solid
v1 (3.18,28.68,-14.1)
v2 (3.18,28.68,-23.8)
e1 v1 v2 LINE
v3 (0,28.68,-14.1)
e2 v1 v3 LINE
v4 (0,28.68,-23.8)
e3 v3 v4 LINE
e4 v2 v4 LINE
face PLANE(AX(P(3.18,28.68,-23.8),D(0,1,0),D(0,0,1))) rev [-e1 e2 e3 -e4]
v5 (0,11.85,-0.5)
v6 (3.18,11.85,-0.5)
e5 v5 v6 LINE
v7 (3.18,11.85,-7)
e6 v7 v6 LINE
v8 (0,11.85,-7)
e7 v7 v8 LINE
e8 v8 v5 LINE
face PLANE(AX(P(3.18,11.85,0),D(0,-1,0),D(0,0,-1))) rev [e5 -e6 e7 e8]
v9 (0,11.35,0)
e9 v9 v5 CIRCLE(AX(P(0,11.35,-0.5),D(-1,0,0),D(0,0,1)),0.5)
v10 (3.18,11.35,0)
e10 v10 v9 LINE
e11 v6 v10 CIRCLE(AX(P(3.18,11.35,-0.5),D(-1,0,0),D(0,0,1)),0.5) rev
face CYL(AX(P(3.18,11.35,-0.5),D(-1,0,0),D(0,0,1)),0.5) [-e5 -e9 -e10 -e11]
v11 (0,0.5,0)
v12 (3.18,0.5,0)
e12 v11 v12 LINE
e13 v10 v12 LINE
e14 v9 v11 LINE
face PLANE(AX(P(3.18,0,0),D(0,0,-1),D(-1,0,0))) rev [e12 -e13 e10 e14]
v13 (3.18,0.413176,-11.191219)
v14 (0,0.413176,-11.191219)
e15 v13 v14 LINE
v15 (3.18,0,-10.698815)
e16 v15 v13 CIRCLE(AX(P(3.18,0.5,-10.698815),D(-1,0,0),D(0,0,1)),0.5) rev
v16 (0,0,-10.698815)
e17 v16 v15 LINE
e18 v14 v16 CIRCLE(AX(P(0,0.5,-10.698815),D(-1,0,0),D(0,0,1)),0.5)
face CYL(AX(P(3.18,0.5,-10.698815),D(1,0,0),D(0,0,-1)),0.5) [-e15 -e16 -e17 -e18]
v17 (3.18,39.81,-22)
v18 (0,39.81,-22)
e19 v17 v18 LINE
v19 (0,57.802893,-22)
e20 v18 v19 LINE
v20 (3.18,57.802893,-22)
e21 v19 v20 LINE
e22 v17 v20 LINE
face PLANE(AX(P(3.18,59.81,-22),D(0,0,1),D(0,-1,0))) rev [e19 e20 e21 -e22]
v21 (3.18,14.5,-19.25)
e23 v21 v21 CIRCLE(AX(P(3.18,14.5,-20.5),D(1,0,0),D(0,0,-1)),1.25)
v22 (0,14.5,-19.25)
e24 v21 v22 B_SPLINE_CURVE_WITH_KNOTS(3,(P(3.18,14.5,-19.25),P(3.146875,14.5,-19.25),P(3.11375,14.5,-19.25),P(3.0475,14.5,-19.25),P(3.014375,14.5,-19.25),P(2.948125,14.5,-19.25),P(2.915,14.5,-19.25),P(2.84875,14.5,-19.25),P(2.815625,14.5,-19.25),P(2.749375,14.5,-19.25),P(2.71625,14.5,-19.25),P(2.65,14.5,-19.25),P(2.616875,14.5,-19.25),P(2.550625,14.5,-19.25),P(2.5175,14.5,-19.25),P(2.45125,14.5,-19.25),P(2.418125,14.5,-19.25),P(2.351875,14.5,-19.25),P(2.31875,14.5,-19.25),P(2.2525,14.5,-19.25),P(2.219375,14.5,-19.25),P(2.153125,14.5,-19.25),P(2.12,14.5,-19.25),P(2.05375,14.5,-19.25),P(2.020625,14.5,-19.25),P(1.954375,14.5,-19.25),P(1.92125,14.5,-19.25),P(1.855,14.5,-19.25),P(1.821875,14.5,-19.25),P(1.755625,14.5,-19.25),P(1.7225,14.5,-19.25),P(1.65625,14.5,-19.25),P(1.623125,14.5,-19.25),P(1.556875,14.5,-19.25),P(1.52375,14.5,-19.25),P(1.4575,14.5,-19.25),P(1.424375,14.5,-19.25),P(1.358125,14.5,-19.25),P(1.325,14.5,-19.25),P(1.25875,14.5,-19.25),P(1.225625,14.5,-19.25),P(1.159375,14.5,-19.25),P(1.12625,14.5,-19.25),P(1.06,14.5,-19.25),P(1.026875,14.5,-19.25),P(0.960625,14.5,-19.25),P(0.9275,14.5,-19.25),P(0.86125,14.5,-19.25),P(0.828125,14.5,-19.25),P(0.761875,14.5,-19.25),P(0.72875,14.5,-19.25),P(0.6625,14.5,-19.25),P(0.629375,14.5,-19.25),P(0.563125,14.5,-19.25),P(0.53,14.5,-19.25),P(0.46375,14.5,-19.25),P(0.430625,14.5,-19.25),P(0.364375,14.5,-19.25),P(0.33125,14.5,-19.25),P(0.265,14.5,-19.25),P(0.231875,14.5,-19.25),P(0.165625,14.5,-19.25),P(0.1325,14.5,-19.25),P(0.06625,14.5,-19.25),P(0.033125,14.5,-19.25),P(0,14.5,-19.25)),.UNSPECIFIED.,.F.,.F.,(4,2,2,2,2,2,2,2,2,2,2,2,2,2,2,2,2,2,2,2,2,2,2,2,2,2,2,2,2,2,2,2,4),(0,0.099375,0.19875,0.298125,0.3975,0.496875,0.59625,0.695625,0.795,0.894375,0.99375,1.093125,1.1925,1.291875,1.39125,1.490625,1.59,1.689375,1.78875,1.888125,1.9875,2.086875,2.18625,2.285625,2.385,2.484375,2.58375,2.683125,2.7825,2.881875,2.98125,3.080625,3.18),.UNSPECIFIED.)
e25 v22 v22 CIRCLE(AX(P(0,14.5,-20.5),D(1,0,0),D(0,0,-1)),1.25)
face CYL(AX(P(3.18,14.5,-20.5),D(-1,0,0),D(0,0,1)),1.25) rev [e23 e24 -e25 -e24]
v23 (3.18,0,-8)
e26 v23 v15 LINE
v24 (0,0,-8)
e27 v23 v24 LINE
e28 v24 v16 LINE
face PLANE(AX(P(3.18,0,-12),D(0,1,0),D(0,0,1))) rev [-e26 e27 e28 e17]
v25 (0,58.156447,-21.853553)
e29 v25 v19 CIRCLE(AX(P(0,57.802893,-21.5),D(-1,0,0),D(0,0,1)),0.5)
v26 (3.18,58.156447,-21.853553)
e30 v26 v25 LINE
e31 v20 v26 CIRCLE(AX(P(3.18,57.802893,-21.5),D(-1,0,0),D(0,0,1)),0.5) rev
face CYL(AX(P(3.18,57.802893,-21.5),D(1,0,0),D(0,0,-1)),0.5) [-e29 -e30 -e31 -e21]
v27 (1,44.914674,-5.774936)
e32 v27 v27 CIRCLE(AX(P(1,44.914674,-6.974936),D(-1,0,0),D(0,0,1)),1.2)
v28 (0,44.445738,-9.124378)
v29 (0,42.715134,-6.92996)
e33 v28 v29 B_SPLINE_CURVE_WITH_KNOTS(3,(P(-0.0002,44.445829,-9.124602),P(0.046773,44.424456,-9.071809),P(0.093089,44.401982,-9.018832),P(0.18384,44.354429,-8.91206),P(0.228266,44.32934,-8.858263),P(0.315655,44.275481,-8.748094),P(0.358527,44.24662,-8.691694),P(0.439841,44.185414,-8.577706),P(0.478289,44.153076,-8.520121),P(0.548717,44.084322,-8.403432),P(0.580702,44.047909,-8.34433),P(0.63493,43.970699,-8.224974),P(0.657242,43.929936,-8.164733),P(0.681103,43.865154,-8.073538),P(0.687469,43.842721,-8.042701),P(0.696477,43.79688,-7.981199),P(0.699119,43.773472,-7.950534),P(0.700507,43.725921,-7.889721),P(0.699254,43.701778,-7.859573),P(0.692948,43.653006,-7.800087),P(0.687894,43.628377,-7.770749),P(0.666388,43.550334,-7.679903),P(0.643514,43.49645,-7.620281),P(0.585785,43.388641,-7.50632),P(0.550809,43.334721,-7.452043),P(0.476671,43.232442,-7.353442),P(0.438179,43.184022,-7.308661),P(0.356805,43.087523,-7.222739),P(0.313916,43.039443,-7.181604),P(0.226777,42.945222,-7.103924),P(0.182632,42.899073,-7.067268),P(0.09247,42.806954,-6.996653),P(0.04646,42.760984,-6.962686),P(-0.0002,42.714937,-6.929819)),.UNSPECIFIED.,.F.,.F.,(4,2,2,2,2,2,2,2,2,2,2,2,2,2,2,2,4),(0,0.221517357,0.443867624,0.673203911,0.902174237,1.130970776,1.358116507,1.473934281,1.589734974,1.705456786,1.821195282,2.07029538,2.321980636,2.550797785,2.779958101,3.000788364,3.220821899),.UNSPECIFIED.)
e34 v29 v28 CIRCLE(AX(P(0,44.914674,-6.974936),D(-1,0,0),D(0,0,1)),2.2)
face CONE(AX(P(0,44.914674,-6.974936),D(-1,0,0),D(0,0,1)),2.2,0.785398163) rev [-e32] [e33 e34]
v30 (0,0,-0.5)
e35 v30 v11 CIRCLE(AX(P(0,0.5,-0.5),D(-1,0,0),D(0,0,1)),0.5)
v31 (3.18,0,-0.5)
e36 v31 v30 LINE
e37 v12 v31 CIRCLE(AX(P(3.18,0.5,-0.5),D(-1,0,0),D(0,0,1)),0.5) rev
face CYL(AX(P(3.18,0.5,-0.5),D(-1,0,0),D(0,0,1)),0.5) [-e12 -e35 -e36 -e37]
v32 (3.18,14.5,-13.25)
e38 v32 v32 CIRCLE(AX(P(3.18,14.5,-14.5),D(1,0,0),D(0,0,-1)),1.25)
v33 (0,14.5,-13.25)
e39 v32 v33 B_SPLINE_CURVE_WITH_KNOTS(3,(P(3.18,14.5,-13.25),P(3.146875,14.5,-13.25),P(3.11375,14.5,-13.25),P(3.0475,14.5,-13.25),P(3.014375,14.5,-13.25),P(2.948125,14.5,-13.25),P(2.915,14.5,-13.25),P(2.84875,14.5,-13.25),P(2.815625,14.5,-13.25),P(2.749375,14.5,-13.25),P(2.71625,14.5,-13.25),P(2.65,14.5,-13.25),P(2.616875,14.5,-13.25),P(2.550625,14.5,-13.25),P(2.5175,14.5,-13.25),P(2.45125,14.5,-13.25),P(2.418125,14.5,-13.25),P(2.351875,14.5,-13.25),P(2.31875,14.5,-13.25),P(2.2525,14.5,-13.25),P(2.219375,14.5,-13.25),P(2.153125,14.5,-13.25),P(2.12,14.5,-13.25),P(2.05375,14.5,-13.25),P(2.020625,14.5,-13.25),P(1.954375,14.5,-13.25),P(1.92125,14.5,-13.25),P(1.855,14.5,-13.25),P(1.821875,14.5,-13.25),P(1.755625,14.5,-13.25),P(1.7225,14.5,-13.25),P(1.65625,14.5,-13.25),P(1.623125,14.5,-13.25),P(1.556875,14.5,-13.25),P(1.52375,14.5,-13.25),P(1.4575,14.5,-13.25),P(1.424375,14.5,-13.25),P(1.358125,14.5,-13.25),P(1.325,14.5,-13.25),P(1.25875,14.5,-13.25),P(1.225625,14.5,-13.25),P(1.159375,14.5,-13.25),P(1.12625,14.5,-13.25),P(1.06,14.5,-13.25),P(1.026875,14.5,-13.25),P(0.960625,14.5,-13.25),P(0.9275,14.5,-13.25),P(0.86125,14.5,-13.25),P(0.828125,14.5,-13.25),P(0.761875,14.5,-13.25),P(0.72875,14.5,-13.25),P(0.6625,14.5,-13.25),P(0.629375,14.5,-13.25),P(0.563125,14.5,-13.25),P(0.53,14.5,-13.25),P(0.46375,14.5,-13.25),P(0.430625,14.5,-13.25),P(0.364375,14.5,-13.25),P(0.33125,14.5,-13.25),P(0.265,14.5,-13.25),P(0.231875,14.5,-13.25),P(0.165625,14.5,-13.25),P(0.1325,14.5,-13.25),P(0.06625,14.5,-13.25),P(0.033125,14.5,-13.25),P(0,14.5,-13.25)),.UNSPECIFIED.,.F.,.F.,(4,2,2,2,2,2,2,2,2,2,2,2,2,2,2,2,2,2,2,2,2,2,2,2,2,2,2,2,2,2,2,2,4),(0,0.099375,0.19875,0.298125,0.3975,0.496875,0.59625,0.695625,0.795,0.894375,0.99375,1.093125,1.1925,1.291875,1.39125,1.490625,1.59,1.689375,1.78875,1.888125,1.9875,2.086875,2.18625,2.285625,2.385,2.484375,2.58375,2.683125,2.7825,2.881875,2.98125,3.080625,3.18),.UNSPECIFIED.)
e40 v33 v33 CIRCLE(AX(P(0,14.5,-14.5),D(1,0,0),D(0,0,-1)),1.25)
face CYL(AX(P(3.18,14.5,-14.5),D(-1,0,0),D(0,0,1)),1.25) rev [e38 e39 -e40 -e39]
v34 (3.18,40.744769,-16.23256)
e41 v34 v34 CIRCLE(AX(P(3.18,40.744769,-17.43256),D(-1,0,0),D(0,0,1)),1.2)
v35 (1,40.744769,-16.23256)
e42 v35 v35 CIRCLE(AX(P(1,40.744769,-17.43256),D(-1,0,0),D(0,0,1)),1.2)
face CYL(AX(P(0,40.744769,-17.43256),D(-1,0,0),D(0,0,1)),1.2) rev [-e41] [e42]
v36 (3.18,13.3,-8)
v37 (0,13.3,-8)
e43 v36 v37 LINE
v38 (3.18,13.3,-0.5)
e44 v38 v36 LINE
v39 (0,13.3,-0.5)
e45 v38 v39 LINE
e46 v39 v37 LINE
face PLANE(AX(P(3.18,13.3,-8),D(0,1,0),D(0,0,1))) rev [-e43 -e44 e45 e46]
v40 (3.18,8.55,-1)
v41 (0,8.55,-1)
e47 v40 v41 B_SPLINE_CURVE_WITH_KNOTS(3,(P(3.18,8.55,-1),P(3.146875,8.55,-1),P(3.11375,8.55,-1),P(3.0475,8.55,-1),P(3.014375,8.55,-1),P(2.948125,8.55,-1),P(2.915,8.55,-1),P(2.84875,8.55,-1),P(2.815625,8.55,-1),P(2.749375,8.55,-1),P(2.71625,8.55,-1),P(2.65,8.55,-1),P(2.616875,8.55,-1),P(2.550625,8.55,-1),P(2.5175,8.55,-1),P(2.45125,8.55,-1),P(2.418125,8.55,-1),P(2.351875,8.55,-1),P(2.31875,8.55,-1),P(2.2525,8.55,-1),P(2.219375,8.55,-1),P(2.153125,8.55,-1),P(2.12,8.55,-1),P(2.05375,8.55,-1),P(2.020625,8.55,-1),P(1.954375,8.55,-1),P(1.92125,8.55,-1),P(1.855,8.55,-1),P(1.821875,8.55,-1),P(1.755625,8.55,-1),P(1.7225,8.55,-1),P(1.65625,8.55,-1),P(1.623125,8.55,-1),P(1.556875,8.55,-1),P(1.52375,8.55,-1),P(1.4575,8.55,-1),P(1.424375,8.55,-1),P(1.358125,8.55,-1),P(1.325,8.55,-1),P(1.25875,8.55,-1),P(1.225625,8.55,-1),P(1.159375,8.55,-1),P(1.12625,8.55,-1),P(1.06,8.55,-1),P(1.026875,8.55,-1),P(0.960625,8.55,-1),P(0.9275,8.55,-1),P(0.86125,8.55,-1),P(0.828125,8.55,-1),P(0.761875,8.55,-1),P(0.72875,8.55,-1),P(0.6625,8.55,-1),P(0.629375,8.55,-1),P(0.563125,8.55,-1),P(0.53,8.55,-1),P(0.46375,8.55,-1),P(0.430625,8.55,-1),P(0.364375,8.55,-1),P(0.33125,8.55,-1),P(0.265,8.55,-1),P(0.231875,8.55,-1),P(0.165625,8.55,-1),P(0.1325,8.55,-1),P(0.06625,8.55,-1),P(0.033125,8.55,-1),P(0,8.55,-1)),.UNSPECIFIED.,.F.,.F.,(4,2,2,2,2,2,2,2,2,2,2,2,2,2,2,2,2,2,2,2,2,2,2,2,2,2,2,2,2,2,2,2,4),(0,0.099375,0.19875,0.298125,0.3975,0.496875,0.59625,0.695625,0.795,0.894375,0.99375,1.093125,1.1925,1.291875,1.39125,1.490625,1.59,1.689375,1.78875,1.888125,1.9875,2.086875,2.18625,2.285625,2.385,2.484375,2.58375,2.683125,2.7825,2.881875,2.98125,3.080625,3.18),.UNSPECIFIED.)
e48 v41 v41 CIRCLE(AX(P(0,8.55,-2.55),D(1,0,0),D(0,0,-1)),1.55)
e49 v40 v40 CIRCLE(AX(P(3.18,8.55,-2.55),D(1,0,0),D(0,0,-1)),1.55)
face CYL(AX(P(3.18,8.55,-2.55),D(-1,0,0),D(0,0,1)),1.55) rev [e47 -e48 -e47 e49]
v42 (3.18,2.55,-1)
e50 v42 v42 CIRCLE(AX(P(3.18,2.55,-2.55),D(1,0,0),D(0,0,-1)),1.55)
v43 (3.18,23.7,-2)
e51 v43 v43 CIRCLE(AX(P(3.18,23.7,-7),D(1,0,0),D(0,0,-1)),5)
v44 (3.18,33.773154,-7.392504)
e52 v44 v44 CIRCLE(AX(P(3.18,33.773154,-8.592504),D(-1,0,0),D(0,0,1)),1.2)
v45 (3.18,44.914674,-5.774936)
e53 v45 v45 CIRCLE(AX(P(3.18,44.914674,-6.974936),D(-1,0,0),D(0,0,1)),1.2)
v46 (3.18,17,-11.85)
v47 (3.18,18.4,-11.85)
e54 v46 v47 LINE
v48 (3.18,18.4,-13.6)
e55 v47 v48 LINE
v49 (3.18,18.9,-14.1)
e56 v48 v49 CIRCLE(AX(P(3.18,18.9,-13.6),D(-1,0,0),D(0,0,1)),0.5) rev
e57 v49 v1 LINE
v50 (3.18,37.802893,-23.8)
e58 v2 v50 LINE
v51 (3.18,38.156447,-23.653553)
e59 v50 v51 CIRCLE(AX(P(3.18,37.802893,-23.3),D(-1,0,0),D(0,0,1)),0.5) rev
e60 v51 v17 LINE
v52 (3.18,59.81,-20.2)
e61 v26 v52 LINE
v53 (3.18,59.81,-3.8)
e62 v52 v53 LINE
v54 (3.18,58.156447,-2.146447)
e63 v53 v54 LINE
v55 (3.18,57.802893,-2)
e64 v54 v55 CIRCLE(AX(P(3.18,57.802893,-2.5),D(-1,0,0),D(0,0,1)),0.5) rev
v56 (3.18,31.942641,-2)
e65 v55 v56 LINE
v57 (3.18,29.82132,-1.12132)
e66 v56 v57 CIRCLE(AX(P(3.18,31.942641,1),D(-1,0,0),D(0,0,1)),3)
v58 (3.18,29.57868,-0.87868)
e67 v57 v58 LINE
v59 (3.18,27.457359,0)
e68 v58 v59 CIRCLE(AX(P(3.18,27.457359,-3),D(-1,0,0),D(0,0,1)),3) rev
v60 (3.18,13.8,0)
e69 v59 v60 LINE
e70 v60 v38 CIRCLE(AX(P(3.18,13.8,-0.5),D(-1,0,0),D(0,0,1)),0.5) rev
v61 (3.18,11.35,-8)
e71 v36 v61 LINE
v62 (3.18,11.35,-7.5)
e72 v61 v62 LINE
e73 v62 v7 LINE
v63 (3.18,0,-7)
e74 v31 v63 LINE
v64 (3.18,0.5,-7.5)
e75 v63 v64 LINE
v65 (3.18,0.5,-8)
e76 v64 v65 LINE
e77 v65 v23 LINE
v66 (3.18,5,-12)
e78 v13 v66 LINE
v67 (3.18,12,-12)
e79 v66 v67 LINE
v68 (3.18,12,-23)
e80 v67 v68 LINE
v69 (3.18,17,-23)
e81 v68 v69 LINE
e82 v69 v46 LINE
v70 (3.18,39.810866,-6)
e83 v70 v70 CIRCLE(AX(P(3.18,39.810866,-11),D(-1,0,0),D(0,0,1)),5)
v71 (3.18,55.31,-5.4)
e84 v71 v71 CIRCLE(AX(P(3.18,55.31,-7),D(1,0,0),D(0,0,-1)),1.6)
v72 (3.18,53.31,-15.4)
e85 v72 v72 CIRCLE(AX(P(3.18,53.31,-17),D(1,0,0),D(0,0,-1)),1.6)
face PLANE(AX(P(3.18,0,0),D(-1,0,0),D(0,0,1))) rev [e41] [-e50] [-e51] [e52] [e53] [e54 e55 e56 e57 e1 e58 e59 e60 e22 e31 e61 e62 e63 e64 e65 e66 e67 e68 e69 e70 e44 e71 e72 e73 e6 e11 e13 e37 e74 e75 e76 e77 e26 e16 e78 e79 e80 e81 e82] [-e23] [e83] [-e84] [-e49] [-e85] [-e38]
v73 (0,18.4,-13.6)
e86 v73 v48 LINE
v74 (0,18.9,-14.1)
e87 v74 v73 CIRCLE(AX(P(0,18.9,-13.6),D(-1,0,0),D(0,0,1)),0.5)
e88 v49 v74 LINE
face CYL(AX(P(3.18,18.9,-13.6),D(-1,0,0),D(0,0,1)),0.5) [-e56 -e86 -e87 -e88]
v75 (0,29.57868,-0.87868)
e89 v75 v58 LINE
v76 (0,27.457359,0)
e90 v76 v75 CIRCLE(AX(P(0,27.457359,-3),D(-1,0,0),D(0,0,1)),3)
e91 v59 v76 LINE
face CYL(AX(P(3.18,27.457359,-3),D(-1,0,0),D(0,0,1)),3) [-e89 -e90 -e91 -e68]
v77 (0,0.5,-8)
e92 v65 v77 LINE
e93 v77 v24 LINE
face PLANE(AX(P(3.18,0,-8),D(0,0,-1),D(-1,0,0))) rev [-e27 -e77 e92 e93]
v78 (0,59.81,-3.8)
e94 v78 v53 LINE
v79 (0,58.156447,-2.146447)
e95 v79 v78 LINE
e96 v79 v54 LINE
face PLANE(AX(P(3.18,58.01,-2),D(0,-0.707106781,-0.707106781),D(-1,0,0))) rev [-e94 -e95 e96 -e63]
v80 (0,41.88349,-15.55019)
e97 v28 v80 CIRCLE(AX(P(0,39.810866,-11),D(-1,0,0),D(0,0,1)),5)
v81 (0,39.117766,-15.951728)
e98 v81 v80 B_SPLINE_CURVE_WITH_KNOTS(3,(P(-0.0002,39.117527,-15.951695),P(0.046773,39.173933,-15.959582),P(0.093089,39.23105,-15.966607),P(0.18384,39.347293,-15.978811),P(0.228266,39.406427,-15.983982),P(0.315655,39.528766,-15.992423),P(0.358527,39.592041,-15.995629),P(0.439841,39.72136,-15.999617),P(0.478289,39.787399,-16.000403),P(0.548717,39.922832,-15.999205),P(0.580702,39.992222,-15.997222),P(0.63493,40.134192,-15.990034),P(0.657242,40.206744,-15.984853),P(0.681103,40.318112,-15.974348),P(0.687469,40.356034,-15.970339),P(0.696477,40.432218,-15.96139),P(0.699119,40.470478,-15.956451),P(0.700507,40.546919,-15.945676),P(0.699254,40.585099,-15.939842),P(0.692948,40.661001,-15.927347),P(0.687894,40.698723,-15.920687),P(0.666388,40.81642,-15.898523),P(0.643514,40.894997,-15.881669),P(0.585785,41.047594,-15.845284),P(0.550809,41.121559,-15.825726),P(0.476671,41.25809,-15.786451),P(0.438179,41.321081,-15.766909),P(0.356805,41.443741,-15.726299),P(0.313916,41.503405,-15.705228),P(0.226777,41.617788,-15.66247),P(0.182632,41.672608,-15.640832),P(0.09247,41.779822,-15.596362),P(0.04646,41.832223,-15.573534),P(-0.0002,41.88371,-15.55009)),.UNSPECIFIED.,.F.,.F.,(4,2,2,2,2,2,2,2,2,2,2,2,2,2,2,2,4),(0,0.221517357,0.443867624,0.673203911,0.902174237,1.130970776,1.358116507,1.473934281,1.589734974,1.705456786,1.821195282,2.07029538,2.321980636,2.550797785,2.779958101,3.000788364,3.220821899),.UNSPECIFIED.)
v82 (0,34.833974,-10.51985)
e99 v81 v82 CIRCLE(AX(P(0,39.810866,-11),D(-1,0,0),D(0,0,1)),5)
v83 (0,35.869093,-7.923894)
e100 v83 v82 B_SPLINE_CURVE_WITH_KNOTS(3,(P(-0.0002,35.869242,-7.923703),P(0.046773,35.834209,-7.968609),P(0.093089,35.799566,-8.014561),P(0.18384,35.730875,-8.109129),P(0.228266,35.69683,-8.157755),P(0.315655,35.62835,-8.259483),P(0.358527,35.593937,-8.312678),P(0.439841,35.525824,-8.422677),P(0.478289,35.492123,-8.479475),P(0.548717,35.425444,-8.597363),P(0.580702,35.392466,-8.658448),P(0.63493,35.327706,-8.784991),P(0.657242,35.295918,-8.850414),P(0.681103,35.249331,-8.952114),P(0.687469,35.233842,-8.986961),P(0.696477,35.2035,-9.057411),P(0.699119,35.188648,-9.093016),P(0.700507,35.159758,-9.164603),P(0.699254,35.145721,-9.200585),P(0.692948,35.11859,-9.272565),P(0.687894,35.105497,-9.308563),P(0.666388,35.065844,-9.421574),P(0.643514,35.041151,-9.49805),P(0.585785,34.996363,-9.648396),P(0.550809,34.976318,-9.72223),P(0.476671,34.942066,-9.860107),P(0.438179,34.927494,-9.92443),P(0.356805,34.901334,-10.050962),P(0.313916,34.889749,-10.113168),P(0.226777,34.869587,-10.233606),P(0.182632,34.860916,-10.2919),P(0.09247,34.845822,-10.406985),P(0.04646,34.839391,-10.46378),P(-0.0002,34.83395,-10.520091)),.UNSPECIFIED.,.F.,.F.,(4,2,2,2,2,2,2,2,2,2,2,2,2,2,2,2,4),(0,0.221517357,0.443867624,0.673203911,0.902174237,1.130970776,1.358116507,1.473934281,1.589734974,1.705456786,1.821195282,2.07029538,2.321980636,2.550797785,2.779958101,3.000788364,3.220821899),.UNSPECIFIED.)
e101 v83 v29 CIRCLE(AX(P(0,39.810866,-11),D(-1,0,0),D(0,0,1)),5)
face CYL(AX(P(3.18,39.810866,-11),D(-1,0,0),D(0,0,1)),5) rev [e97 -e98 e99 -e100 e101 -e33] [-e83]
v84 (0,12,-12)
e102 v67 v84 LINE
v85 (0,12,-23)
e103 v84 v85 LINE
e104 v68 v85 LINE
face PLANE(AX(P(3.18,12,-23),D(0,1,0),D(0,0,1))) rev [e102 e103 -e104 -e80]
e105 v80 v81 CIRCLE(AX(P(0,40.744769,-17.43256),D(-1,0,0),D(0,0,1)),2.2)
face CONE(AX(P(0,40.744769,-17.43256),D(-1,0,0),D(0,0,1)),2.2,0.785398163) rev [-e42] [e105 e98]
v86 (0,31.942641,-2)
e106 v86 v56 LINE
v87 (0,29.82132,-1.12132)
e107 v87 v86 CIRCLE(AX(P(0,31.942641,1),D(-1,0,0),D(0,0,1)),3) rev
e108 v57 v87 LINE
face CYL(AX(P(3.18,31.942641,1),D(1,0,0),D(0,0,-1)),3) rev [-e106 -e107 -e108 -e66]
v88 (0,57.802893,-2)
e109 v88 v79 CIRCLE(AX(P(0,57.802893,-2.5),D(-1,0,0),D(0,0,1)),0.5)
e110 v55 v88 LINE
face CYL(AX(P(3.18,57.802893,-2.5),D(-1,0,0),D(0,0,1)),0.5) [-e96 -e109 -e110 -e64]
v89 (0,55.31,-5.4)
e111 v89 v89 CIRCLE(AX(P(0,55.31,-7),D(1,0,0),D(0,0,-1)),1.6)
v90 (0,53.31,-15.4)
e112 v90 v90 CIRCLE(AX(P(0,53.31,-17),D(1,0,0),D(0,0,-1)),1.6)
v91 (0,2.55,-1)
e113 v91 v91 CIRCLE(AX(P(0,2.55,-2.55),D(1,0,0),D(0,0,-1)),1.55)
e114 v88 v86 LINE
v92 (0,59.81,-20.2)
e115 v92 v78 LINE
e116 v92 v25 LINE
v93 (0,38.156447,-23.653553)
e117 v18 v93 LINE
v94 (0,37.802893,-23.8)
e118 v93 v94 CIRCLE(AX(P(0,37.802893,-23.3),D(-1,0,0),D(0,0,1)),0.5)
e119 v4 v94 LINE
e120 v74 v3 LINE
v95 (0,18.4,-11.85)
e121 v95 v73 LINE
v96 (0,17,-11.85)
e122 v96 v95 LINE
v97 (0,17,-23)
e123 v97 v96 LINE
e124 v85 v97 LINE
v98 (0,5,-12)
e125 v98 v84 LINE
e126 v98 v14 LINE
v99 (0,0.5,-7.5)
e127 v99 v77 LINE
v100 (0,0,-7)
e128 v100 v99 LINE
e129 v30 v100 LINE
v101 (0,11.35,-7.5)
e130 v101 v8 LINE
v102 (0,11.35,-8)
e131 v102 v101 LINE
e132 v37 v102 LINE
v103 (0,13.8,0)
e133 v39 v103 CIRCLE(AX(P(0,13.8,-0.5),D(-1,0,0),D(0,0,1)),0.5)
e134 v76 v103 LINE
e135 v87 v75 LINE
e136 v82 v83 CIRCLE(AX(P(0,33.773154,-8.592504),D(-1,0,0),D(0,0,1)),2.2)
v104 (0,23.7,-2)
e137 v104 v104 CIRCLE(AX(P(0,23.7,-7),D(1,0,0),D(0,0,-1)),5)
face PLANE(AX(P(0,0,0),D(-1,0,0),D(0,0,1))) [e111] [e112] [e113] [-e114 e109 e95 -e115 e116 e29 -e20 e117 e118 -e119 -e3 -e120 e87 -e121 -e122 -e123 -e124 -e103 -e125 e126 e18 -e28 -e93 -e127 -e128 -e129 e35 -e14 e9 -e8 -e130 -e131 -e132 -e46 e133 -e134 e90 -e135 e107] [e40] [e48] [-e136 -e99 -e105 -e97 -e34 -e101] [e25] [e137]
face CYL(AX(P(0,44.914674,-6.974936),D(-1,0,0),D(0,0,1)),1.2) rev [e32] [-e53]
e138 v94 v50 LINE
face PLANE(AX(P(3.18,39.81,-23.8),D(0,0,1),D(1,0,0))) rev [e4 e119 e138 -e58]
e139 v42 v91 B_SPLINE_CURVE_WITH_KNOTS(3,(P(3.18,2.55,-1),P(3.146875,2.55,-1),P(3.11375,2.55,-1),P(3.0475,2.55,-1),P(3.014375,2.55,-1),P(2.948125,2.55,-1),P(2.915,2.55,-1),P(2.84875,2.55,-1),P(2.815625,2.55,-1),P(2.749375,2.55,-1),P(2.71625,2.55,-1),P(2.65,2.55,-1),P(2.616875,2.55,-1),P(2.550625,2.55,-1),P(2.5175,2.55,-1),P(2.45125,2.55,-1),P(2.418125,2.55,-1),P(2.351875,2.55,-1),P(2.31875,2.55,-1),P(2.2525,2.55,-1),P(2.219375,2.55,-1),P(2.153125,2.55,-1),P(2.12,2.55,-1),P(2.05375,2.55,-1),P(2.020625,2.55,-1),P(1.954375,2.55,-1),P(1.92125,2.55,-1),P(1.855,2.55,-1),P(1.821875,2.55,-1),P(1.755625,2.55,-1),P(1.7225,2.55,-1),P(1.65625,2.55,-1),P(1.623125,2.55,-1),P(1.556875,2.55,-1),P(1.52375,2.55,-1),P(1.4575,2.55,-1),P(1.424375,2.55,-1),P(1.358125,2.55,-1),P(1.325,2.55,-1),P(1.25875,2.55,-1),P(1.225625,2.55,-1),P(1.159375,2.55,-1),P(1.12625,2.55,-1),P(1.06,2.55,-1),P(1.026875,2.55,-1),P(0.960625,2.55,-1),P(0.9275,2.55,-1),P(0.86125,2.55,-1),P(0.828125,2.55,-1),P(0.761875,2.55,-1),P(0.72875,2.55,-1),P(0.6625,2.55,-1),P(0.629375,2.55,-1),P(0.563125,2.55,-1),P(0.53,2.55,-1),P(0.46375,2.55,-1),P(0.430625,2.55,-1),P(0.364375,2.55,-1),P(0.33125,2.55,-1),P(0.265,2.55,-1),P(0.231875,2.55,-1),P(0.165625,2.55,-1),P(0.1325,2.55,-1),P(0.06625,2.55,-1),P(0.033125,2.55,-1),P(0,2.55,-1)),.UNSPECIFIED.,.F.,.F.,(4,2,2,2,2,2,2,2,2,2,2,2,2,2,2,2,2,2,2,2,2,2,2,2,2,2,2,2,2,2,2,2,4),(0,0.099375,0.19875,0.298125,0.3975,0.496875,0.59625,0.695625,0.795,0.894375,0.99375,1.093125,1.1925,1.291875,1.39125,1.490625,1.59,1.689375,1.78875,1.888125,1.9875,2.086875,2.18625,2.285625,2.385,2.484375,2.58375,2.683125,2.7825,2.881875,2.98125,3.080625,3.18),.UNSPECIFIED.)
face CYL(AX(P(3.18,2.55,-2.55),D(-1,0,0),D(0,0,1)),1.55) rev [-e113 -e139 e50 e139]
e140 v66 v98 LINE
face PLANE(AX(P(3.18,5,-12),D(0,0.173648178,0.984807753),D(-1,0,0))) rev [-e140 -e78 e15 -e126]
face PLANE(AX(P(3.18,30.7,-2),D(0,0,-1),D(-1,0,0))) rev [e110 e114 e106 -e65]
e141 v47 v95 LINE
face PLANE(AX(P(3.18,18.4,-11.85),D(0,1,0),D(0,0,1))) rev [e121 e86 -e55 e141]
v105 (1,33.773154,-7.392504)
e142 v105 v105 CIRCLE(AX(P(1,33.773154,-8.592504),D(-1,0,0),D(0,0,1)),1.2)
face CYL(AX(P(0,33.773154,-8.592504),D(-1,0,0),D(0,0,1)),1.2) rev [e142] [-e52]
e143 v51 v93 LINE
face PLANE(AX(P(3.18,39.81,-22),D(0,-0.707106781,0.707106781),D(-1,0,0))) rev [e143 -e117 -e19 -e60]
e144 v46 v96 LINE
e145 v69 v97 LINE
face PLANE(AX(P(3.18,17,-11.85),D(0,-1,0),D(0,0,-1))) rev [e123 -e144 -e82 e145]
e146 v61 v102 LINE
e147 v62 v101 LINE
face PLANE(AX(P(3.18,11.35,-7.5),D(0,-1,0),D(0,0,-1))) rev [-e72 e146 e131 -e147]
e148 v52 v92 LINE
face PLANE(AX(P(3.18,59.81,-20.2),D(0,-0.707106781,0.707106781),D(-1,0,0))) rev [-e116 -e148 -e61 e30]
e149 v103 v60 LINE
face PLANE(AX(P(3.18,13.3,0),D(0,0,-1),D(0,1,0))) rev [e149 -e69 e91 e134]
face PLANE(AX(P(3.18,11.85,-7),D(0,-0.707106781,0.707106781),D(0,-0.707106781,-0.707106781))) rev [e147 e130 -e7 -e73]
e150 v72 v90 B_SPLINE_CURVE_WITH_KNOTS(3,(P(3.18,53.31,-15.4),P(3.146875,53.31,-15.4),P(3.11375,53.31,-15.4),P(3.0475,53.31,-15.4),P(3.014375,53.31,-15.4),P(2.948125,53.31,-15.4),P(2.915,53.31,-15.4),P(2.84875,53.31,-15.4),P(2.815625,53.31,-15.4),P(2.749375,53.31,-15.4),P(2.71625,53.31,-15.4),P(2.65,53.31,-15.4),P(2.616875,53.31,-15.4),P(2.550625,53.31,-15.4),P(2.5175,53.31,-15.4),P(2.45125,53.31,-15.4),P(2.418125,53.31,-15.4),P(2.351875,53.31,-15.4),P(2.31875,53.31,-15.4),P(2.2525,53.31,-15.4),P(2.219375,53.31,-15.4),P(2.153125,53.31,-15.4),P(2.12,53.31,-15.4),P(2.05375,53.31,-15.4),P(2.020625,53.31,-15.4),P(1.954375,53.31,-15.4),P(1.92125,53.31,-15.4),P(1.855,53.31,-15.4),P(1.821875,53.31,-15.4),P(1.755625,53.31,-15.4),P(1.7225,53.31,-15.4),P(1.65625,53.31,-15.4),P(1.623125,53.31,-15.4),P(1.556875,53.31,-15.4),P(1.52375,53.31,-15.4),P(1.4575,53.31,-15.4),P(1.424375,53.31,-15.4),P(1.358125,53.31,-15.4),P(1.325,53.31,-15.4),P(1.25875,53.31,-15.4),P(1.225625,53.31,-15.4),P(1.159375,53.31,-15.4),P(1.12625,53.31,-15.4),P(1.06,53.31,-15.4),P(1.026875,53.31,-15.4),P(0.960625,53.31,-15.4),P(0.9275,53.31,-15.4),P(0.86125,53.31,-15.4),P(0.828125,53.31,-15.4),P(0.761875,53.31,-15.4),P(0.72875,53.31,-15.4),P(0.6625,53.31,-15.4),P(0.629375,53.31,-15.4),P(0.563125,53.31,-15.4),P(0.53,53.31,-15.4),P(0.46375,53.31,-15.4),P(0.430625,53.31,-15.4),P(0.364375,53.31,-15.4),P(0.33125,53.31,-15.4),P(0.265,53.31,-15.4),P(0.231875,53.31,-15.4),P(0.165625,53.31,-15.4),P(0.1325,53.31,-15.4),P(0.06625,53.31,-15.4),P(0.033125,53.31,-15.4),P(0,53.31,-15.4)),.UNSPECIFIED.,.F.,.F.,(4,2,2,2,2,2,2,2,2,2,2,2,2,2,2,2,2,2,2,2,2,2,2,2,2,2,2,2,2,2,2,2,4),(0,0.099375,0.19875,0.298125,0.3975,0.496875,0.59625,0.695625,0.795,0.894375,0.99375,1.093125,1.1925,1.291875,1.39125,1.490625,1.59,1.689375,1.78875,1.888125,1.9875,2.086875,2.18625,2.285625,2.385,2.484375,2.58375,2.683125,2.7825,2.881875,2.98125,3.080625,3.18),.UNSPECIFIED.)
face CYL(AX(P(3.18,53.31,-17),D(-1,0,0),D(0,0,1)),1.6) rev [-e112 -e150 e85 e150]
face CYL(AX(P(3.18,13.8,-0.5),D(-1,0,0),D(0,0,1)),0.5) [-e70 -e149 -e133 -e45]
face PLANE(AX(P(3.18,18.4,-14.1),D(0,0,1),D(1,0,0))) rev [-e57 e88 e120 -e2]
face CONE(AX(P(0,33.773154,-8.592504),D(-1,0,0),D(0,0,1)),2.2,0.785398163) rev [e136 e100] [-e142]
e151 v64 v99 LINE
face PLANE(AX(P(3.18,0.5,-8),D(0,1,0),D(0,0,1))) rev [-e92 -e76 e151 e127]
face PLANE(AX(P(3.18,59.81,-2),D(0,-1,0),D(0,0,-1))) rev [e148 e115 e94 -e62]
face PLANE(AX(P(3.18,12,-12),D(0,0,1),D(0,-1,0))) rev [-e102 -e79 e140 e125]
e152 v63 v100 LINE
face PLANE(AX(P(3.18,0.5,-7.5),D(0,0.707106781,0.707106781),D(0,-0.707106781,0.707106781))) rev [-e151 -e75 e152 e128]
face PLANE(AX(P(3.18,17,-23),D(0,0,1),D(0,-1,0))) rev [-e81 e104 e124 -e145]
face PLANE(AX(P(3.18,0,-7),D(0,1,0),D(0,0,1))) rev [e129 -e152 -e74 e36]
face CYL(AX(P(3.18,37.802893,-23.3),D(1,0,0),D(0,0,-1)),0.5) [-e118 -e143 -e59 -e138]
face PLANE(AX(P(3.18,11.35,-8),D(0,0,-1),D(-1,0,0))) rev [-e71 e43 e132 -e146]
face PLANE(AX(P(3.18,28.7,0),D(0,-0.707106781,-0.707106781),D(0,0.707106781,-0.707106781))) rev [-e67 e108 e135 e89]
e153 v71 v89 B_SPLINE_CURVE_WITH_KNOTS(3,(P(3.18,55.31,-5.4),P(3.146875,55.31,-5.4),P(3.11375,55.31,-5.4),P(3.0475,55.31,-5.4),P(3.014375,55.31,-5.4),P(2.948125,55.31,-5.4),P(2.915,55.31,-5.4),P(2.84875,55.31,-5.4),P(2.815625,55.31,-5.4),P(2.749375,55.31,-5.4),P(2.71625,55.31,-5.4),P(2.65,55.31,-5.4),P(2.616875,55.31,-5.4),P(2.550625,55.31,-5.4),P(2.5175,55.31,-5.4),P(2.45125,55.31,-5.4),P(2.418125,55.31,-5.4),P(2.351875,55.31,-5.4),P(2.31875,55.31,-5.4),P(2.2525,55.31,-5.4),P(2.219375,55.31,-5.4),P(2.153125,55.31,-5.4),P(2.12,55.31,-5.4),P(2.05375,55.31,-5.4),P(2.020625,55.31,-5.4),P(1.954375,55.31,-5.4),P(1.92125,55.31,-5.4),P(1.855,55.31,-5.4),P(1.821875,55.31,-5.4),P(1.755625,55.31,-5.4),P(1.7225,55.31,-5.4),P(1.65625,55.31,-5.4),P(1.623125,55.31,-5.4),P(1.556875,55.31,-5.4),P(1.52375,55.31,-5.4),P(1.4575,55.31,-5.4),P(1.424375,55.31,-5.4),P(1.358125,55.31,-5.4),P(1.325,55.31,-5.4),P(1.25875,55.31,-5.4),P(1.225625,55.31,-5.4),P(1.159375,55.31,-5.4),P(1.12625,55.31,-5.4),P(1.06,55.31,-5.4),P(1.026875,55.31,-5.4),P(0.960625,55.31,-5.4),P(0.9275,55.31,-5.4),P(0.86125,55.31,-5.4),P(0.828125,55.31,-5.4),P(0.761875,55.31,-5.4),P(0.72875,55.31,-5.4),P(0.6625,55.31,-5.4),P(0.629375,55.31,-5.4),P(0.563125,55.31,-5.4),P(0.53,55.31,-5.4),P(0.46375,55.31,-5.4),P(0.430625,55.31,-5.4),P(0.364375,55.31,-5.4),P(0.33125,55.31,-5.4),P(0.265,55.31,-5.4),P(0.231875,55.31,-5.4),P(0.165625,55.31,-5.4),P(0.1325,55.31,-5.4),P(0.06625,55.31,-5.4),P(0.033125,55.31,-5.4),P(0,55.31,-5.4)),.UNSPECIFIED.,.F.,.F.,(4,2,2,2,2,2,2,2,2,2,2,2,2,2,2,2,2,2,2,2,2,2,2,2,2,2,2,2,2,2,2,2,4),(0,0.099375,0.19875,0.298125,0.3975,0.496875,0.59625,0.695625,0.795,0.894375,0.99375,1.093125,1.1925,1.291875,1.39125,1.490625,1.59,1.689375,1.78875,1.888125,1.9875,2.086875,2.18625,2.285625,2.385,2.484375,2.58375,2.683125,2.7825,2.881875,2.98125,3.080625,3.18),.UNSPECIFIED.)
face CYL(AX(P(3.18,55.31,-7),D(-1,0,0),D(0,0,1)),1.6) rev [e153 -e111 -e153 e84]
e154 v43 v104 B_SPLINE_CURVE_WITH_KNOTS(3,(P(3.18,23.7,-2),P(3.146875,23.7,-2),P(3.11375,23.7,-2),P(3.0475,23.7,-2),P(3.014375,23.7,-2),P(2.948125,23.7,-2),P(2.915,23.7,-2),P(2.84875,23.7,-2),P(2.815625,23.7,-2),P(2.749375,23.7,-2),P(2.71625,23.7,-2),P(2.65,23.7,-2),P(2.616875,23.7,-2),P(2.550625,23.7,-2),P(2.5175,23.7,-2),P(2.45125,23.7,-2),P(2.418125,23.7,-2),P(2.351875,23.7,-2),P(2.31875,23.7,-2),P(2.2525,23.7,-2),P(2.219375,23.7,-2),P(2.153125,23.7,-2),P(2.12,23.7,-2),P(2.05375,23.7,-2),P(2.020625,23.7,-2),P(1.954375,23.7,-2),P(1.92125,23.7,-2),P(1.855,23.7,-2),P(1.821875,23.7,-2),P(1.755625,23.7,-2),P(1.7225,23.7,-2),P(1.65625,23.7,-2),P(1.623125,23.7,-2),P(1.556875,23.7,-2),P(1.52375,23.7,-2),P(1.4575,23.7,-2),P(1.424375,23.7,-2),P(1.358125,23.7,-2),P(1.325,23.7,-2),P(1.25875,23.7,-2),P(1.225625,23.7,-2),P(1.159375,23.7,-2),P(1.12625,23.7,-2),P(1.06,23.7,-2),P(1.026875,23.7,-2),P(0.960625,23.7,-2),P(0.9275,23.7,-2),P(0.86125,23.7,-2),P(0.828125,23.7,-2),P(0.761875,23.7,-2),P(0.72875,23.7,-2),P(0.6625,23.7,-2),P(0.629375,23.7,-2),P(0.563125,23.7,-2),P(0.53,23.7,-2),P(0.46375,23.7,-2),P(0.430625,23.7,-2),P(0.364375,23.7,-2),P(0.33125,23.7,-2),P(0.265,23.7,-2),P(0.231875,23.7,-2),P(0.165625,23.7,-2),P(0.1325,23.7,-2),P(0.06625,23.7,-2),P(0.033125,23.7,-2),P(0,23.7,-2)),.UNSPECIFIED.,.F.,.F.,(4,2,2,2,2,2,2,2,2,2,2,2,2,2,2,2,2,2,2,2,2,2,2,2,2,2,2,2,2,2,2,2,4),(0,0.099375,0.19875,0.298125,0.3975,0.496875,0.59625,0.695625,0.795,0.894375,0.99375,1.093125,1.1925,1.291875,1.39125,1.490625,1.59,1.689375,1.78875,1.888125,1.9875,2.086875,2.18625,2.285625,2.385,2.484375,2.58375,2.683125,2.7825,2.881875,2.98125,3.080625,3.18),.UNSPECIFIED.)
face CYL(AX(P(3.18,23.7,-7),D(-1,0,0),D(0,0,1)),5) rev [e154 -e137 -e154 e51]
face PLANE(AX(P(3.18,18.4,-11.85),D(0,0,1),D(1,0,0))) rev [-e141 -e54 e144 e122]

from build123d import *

# Parameters (mm, degrees)
SKETCH1_R                                       = 5
SKETCH1_R_2                                     = 1.6
SKETCH1_R_3                                     = 1.25
SKETCH1_R_4                                     = 1.55
BOSS_EXTRUDE1_DEPTH                             = 3.18
CHAMFER1_SIZE                                   = 5
CHAMFER1_SIZE2                                  = 0.881634904
CSK_FOR_M2_FLAT_HEAD_MACHINE_SCREW1_D           = 2.4
CSK_FOR_M2_FLAT_HEAD_MACHINE_SCREW1_DEPTH       = 3.508967257
CSK_FOR_M2_FLAT_HEAD_MACHINE_SCREW1_CSINK_D     = 4.4
CSK_FOR_M2_FLAT_HEAD_MACHINE_SCREW1_CSINK_ANGLE = 90
CSK_FOR_M2_FLAT_HEAD_MACHINE_SCREW1_TIP         = 0.721032743
SKETCH3_R                                       = 5
CUT_EXTRUDE4_DEPTH                              = 65.449891389
FILLET2_R                                       = 3
CHAMFER2_SIZE                                   = 1.8
FILLET4_R                                       = 0.5


with BuildPart() as part:
    # Sketch1 → Boss-Extrude1 (new body)
    with BuildSketch(Plane(origin=(0, 0, 0), x_dir=(0, 0, -1), z_dir=(1, 0, 0))):
        Polygon((0, 0), (0, 11.85), (7, 11.85), (7.5, 11.35), (8, 11.35), (8, 13.3), (0, 13.3), (0, 28.7), (2, 30.7), (2, 59.81), (22, 59.81), (22, 39.81), (23.8, 39.81), (23.8, 28.68), (14.1, 28.68), (14.1, 18.4), (11.85, 18.4), (11.85, 17), (23, 17), (23, 12), (12, 12), (12, 0), (8, 0), (8, 0.5), (7.5, 0.5), (7, 0), align=None)
        with Locations(Location((7, 23.7, 0), (0, 0, 180))):
            Circle(SKETCH1_R, mode=Mode.SUBTRACT)
        with Locations(Location((7, 55.31, 0), (0, 0, 180))):
            Circle(SKETCH1_R_2, mode=Mode.SUBTRACT)
        with Locations(Location((17, 53.31, 0), (0, 0, 180))):
            Circle(SKETCH1_R_2, mode=Mode.SUBTRACT)
        with Locations(Location((20.5, 14.5, 0), (0, 0, 180))):
            Circle(SKETCH1_R_3, mode=Mode.SUBTRACT)
        with Locations(Location((14.5, 14.5, 0), (0, 0, 180))):
            Circle(SKETCH1_R_3, mode=Mode.SUBTRACT)
        with Locations(Location((2.55, 2.55, 0), (0, 0, 180))):
            Circle(SKETCH1_R_4, mode=Mode.SUBTRACT)
        with Locations(Location((2.55, 8.55, 0), (0, 0, 180))):
            Circle(SKETCH1_R_4, mode=Mode.SUBTRACT)
    extrude(amount=BOSS_EXTRUDE1_DEPTH)

    # Chamfer1
    chamfer1_edges = [part.edges().sort_by_distance(p)[0] for p in [
        (1.59, 0, -12),
    ]]
    chamfer1_side = [part.faces().sort_by_distance(p)[0] for p in [
        (1.59, 6, -12),
    ]]
    chamfer(chamfer1_edges, length=CHAMFER1_SIZE, length2=CHAMFER1_SIZE2, reference=chamfer1_side[0])

    # CSK for M2 Flat Head Machine Screw1
    with Locations(Plane.ZY):
        with Locations((-6.974936087, 44.914674329), (-17.432559713, 40.744769284), (-8.592504199, 33.773154083)):
            CounterSinkHole(CSK_FOR_M2_FLAT_HEAD_MACHINE_SCREW1_D / 2, CSK_FOR_M2_FLAT_HEAD_MACHINE_SCREW1_CSINK_D / 2, depth=CSK_FOR_M2_FLAT_HEAD_MACHINE_SCREW1_DEPTH, counter_sink_angle=CSK_FOR_M2_FLAT_HEAD_MACHINE_SCREW1_CSINK_ANGLE)
            with Locations((0, 0, -(CSK_FOR_M2_FLAT_HEAD_MACHINE_SCREW1_DEPTH + CSK_FOR_M2_FLAT_HEAD_MACHINE_SCREW1_TIP / 2))):  # 118° drill point
                Cone(0, CSK_FOR_M2_FLAT_HEAD_MACHINE_SCREW1_D / 2, CSK_FOR_M2_FLAT_HEAD_MACHINE_SCREW1_TIP, mode=Mode.SUBTRACT)

    # Sketch3 → Cut-Extrude4 (cut, through all)
    with BuildSketch(Plane.ZY):
        with Locations((-11, 39.810865899)):
            Circle(SKETCH3_R)
    extrude(amount=-CUT_EXTRUDE4_DEPTH, mode=Mode.SUBTRACT)

    # Fillet2
    fillet2_edges = [part.edges().sort_by_distance(p)[0] for p in [
        (1.59, 28.7, 0),
        (1.59, 30.7, -2),
    ]]
    fillet(fillet2_edges, radius=FILLET2_R)

    # Chamfer2
    chamfer2_edges = [part.edges().sort_by_distance(p)[0] for p in [
        (1.59, 59.81, -22),
        (1.59, 59.81, -2),
        (1.59, 39.81, -23.8),
    ]]
    chamfer(chamfer2_edges, length=CHAMFER2_SIZE - 0.0001)  # a hair under: the kernel refuses the full size

    # Fillet4
    fillet4_edges = [part.edges().sort_by_distance(p)[0] for p in [
        (1.59, 0, -11.118365096),
        (1.59, 38.0101, -23.8),
        (1.59, 58.0101, -22),
        (1.59, 58.0101, -2),
        (1.59, 0, 0),
        (1.59, 11.85, 0),
        (1.59, 13.3, 0),
        (1.59, 18.4, -14.1),
    ]]
    fillet(fillet4_edges, radius=FILLET4_R)


solid = part.part
